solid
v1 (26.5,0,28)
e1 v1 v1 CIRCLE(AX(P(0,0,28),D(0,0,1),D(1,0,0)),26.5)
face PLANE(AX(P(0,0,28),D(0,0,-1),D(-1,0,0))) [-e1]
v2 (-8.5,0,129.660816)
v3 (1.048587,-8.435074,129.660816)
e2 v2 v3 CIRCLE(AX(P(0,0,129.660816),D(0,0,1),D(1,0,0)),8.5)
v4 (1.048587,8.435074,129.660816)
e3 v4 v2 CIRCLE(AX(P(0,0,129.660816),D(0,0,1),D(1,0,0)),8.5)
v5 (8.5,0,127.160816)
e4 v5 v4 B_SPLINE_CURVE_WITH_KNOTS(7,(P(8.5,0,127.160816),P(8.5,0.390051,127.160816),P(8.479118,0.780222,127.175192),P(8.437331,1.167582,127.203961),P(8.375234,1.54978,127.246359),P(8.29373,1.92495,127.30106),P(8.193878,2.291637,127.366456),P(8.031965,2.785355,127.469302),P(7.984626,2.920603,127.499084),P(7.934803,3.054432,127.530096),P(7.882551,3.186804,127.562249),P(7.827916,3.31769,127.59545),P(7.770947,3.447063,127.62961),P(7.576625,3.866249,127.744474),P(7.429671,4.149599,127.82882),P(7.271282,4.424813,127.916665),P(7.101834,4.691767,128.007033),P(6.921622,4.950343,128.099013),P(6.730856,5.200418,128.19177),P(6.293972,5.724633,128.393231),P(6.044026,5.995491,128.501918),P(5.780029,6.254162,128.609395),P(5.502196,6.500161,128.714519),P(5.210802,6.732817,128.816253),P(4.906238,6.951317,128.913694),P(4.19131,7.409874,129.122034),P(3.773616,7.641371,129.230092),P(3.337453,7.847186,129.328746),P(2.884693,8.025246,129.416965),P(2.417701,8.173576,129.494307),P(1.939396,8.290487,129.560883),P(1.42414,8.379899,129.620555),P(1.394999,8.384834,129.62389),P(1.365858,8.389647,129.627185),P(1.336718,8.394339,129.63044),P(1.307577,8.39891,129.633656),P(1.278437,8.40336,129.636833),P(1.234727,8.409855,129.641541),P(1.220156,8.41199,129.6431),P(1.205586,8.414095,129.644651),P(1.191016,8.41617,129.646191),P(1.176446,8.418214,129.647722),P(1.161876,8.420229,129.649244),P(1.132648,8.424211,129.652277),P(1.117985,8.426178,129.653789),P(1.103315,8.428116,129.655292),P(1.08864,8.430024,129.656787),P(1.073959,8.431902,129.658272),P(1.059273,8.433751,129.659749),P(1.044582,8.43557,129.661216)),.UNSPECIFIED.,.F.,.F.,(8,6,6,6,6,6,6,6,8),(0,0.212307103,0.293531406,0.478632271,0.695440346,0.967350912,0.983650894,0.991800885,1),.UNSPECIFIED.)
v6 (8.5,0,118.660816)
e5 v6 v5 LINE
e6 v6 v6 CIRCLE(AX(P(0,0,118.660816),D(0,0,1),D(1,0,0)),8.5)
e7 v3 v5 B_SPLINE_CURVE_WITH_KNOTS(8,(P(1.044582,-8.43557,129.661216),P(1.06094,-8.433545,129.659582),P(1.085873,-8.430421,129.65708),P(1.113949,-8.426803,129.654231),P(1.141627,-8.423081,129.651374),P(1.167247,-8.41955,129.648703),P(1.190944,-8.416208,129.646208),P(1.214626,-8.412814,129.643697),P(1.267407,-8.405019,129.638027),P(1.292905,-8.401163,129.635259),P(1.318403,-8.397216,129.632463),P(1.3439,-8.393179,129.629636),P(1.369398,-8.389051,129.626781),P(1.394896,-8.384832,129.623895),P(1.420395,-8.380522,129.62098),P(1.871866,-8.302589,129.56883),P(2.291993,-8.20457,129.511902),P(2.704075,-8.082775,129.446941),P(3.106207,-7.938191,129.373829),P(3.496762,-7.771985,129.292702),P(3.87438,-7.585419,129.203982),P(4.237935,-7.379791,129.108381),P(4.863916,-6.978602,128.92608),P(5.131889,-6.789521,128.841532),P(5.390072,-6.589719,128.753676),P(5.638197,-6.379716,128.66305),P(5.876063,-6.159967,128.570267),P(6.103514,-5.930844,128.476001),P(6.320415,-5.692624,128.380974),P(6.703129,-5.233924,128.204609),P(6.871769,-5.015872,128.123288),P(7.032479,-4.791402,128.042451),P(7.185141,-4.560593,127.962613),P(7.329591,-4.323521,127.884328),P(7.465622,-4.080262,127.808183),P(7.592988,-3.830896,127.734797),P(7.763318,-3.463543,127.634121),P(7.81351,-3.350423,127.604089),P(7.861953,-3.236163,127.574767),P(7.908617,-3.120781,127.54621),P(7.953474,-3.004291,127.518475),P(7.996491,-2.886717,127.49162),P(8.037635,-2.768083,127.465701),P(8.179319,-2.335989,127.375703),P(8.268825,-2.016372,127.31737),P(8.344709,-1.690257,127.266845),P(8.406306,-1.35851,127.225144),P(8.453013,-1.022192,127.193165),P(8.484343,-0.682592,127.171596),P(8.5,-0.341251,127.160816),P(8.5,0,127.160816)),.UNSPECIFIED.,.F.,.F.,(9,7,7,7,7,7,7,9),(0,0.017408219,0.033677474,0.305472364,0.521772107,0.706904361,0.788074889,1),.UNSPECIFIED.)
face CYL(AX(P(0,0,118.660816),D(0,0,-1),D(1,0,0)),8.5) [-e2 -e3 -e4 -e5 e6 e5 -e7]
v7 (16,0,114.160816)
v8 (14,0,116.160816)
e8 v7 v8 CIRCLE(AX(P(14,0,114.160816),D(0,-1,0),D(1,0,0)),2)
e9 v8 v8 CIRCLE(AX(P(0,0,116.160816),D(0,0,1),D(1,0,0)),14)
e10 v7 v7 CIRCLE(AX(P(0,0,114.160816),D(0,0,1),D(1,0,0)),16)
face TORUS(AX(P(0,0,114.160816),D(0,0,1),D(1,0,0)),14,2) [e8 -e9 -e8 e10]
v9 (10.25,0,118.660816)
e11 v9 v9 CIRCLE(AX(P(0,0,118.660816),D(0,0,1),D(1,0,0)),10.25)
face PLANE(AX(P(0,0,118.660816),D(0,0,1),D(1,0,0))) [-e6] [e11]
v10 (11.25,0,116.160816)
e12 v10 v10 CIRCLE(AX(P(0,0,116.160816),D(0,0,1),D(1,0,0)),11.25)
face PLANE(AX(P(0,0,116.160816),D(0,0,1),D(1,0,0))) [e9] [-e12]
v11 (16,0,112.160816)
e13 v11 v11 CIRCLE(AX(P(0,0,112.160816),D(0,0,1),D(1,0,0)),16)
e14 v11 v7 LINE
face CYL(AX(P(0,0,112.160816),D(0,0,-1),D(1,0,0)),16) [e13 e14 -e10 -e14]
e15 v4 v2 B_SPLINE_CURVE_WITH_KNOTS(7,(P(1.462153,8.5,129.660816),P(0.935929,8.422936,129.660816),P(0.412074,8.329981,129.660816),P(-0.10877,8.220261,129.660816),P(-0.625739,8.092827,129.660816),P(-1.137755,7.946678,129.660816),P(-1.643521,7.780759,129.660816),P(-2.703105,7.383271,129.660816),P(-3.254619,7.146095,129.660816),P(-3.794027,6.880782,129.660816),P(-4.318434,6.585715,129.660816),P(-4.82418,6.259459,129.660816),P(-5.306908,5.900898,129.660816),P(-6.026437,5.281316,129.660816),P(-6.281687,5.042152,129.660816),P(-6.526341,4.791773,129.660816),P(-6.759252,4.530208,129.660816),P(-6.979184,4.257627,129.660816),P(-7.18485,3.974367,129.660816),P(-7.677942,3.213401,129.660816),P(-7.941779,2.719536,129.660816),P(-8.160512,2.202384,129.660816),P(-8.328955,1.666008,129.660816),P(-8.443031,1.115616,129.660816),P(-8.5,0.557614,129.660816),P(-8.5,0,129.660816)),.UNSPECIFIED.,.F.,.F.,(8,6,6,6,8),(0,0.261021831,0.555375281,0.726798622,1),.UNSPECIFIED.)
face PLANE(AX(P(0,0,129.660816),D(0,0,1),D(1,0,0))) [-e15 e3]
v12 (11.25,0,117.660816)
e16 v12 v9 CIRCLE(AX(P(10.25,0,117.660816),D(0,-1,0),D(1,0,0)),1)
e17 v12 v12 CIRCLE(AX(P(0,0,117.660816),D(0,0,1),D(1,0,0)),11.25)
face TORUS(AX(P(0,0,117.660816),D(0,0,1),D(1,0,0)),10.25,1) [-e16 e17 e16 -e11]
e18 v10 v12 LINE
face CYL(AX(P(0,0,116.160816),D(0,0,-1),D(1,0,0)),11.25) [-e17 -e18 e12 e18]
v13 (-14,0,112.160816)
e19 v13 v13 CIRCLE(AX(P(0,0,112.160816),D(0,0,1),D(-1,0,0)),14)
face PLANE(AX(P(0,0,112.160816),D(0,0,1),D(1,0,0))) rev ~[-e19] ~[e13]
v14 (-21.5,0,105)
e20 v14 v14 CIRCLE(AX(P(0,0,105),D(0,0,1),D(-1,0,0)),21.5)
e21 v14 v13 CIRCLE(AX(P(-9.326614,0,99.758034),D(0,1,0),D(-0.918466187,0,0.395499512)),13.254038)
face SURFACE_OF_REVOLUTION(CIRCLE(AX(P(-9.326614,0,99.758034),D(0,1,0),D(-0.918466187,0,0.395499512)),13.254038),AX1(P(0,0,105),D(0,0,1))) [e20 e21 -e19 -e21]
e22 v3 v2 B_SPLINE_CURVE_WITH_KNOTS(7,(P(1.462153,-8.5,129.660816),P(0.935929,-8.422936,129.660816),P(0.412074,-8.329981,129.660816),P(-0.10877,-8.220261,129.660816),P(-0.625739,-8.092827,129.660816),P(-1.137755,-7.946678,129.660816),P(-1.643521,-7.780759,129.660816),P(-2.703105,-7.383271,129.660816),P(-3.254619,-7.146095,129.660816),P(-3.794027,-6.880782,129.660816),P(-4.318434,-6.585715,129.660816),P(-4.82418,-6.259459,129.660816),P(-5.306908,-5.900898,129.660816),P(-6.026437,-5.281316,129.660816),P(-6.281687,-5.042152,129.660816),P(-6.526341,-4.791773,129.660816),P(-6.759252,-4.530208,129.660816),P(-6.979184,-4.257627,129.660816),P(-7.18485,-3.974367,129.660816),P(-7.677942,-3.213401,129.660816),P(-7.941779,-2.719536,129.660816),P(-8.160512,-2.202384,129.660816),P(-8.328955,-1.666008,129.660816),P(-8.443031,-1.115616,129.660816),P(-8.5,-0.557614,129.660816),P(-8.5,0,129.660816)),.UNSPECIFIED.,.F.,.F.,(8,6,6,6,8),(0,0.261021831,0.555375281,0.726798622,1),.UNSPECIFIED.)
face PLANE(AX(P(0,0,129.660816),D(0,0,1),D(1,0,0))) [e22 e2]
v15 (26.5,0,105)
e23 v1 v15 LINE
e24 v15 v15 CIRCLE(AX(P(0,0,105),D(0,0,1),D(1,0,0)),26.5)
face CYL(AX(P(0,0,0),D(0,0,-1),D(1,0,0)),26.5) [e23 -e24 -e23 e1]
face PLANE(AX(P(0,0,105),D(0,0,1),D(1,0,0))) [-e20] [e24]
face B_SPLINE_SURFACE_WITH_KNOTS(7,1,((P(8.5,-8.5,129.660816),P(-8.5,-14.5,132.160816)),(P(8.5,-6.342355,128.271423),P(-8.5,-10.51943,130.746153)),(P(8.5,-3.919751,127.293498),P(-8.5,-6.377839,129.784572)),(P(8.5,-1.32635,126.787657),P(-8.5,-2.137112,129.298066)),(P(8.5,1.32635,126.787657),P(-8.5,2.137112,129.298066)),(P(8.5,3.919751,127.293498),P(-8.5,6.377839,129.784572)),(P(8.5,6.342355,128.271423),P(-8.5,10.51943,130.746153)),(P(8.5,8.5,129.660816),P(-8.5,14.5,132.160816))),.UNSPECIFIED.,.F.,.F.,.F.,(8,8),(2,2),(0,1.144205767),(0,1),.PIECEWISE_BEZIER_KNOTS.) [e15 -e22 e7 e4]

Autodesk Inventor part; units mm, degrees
ref_plane "XZ Plane" through (0, 0, 0) normal (0, 1, 0) x (-1, 0, 0)
sketch "Sketch1" plane through (0, 0, 0) normal (0, 0, 1) x (1, 0, 0)
  circle A0 centre (0, 0) radius 26.5
  dimension "d0" = 53
extrude "Extrusion1" add sketch "Sketch1" along normal blind 105
sketch "Sketch2" plane through (0, 0, 0) normal (0, 1, 0) x (-1, 0, 0)
  line L0 (6.5, 97) -> (21.5, 97)
  line L1 (21.5, 97) -> (21.5, 105)
  line L2 (14, 112.160816) -> (6.5, 112.160816)
  line L3 (6.5, 105) -> (6.5, 97)
  line L4 (26.5, 0) -> (26.5, 105) construction
  line L5 (0, -19.756358) -> (0, 218.345658) construction
  line L6 (21.5, 105) -> (0, 105)
  line L7 (0, 105) -> (0, 112.160816)
  line L8 (0, 112.160816) -> (14, 112.160816)
  line L9 (14, 122.762224) -> (14, 96.929674) construction
  arc A0 (21.5, 105) -> (14, 112.160816) centre (9.326615, 99.758035) ccw construction
  arc A1 (21.5, 105) -> (14, 112.160816) centre (9.326615, 99.758035) ccw
  line L10 (0, -67.376762) -> (0, 265.966062)
  point P0 (0, 0)
  dimension "d4" = 8
  dimension "d5" = 5
revolve "Revolution1" add sketch "Sketch2" angle 360 about axis through (0, 0, -10) along (0, 0, 1) contours L6 L7 L8 L2 A1
sketch "Sketch3" plane through (0, 0, 112.160816) normal (0, 0, 1) x (1, 0, 0)
  circle A0 centre (0, 0) radius 14 projected
  circle A1 centre (0, 0) radius 16
  dimension "d8" = 32
extrude "Extrusion2" add sketch "Sketch3" along normal blind 4 contours A0 | A1
sketch "Sketch4" plane through (0, 0, 116.160816) normal (0, 0, 1) x (1, 0, 0)
  circle A0 centre (0, 0) radius 16 projected
  circle A1 centre (0, 0) radius 11.25
  dimension "d11" = 22.5
extrude "Extrusion3" add sketch "Sketch4" along normal blind 2.5 contours A1
sketch "Sketch5" plane through (0, 0, 118.660816) normal (0, 0, 1) x (1, 0, 0)
  circle A0 centre (0, 0) radius 11.25 projected
  circle A1 centre (0, 0) radius 8.5
  dimension "d14" = 17
extrude "Extrusion4" add sketch "Sketch5" along normal blind 11 contours A1
ref_plane "Work Plane1" through (8.5, 0, 0) normal (1, 0, 0) x (0, 1, 0)
sketch "Sketch6" plane through (8.5, 0, 0) normal (1, 0, 0) x (0, 1, 0)
  line L0 (8.5, 129.660816) -> (-8.5, 129.660816) construction
  line L1 (11.25, 118.660816) -> (-11.25, 118.660816) construction
  line L2 (-11.850613, 127.160816) -> (16.091514, 127.160816) construction
  line L3 (-8.5, 118.660816) -> (-8.5, 129.660816) construction
  line L4 (8.5, 118.660816) -> (8.5, 129.660816) construction
  arc A0 (-8.5, 129.660816) -> (8.5, 129.660816) centre (0, 142.860816) ccw
  line L5 (-8.5, 129.660816) -> (8.5, 129.660816)
  point P0 (0, 0)
  dimension "d18" = 8.5
ref_plane "Work Plane2" through (-8.5, 0, 0) normal (1, 0, 0) x (0, 1, 0)
sketch "Sketch7" plane through (-8.5, 0, 0) normal (1, 0, 0) x (0, 1, 0)
  line L0 (8.5, 118.660816) -> (8.5, 129.660816) construction
  line L1 (-8.5, 118.660816) -> (-8.5, 129.660816) construction
  line L2 (11.25, 118.660816) -> (-11.25, 118.660816) construction
  line L3 (10.28234, 132.160816) -> (-15.326143, 132.160816) construction
  line L4 (8.5, 128.85356) -> (8.5, 132.770152) construction
  line L5 (-8.5, 128.418383) -> (-8.5, 133.238804) construction
  line L6 (8.5, 132.160816) -> (-8.5, 132.160816)
  line L7 (14.5, 124.804712) -> (14.5, 141.766568) construction
  line L8 (-14.5, 142.728943) -> (-14.5, 126.729462) construction
  line L9 (18.190676, 132.160816) -> (-22.229061, 132.160816) construction
  arc A0 (-14.5, 132.160816) -> (14.5, 132.160816) centre (0, 172.960816) ccw
  line L10 (14.5, 132.160816) -> (-14.5, 132.160816)
  point P0 (0, 0)
  dimension "d22" = 6
  dimension "d23" = 6
sketch "Sketch6 outline for Loft1" plane through (8.5, 0, 0) normal (1, 0, 0) x (0, 1, 0)
  line L0 (8.5, 129.660816) -> (-8.5, 129.660816)
  arc A0 (-8.5, 129.660816) -> (8.5, 129.660816) centre (0, 142.860816) ccw
sketch "Sketch7 outline for Loft1" plane through (-8.5, 0, 0) normal (1, 0, 0) x (0, 1, 0)
  line L0 (14.5, 132.160816) -> (-14.5, 132.160816)
  arc A0 (-14.5, 132.160816) -> (14.5, 132.160816) centre (0, 172.960816) ccw
loft "Loft1" cut profiles "Sketch6 outline for Loft1", "Sketch7 outline for Loft1"
fillet "Fillet1" radius 2 1 edges at (-16, 0, 116.1608)
fillet "Fillet2" radius 1 1 edges at (-11.25, 0, 118.6608)
sketch "Sketch8" plane through (0, 0, 0) normal (0, 0, -1) x (-1, 0, 0)
  circle A0 centre (0, 0) radius 26.5 projected
extrude "Extrusion5" cut sketch "Sketch8" against normal blind 28
properties part number "SprayCan77mm"
